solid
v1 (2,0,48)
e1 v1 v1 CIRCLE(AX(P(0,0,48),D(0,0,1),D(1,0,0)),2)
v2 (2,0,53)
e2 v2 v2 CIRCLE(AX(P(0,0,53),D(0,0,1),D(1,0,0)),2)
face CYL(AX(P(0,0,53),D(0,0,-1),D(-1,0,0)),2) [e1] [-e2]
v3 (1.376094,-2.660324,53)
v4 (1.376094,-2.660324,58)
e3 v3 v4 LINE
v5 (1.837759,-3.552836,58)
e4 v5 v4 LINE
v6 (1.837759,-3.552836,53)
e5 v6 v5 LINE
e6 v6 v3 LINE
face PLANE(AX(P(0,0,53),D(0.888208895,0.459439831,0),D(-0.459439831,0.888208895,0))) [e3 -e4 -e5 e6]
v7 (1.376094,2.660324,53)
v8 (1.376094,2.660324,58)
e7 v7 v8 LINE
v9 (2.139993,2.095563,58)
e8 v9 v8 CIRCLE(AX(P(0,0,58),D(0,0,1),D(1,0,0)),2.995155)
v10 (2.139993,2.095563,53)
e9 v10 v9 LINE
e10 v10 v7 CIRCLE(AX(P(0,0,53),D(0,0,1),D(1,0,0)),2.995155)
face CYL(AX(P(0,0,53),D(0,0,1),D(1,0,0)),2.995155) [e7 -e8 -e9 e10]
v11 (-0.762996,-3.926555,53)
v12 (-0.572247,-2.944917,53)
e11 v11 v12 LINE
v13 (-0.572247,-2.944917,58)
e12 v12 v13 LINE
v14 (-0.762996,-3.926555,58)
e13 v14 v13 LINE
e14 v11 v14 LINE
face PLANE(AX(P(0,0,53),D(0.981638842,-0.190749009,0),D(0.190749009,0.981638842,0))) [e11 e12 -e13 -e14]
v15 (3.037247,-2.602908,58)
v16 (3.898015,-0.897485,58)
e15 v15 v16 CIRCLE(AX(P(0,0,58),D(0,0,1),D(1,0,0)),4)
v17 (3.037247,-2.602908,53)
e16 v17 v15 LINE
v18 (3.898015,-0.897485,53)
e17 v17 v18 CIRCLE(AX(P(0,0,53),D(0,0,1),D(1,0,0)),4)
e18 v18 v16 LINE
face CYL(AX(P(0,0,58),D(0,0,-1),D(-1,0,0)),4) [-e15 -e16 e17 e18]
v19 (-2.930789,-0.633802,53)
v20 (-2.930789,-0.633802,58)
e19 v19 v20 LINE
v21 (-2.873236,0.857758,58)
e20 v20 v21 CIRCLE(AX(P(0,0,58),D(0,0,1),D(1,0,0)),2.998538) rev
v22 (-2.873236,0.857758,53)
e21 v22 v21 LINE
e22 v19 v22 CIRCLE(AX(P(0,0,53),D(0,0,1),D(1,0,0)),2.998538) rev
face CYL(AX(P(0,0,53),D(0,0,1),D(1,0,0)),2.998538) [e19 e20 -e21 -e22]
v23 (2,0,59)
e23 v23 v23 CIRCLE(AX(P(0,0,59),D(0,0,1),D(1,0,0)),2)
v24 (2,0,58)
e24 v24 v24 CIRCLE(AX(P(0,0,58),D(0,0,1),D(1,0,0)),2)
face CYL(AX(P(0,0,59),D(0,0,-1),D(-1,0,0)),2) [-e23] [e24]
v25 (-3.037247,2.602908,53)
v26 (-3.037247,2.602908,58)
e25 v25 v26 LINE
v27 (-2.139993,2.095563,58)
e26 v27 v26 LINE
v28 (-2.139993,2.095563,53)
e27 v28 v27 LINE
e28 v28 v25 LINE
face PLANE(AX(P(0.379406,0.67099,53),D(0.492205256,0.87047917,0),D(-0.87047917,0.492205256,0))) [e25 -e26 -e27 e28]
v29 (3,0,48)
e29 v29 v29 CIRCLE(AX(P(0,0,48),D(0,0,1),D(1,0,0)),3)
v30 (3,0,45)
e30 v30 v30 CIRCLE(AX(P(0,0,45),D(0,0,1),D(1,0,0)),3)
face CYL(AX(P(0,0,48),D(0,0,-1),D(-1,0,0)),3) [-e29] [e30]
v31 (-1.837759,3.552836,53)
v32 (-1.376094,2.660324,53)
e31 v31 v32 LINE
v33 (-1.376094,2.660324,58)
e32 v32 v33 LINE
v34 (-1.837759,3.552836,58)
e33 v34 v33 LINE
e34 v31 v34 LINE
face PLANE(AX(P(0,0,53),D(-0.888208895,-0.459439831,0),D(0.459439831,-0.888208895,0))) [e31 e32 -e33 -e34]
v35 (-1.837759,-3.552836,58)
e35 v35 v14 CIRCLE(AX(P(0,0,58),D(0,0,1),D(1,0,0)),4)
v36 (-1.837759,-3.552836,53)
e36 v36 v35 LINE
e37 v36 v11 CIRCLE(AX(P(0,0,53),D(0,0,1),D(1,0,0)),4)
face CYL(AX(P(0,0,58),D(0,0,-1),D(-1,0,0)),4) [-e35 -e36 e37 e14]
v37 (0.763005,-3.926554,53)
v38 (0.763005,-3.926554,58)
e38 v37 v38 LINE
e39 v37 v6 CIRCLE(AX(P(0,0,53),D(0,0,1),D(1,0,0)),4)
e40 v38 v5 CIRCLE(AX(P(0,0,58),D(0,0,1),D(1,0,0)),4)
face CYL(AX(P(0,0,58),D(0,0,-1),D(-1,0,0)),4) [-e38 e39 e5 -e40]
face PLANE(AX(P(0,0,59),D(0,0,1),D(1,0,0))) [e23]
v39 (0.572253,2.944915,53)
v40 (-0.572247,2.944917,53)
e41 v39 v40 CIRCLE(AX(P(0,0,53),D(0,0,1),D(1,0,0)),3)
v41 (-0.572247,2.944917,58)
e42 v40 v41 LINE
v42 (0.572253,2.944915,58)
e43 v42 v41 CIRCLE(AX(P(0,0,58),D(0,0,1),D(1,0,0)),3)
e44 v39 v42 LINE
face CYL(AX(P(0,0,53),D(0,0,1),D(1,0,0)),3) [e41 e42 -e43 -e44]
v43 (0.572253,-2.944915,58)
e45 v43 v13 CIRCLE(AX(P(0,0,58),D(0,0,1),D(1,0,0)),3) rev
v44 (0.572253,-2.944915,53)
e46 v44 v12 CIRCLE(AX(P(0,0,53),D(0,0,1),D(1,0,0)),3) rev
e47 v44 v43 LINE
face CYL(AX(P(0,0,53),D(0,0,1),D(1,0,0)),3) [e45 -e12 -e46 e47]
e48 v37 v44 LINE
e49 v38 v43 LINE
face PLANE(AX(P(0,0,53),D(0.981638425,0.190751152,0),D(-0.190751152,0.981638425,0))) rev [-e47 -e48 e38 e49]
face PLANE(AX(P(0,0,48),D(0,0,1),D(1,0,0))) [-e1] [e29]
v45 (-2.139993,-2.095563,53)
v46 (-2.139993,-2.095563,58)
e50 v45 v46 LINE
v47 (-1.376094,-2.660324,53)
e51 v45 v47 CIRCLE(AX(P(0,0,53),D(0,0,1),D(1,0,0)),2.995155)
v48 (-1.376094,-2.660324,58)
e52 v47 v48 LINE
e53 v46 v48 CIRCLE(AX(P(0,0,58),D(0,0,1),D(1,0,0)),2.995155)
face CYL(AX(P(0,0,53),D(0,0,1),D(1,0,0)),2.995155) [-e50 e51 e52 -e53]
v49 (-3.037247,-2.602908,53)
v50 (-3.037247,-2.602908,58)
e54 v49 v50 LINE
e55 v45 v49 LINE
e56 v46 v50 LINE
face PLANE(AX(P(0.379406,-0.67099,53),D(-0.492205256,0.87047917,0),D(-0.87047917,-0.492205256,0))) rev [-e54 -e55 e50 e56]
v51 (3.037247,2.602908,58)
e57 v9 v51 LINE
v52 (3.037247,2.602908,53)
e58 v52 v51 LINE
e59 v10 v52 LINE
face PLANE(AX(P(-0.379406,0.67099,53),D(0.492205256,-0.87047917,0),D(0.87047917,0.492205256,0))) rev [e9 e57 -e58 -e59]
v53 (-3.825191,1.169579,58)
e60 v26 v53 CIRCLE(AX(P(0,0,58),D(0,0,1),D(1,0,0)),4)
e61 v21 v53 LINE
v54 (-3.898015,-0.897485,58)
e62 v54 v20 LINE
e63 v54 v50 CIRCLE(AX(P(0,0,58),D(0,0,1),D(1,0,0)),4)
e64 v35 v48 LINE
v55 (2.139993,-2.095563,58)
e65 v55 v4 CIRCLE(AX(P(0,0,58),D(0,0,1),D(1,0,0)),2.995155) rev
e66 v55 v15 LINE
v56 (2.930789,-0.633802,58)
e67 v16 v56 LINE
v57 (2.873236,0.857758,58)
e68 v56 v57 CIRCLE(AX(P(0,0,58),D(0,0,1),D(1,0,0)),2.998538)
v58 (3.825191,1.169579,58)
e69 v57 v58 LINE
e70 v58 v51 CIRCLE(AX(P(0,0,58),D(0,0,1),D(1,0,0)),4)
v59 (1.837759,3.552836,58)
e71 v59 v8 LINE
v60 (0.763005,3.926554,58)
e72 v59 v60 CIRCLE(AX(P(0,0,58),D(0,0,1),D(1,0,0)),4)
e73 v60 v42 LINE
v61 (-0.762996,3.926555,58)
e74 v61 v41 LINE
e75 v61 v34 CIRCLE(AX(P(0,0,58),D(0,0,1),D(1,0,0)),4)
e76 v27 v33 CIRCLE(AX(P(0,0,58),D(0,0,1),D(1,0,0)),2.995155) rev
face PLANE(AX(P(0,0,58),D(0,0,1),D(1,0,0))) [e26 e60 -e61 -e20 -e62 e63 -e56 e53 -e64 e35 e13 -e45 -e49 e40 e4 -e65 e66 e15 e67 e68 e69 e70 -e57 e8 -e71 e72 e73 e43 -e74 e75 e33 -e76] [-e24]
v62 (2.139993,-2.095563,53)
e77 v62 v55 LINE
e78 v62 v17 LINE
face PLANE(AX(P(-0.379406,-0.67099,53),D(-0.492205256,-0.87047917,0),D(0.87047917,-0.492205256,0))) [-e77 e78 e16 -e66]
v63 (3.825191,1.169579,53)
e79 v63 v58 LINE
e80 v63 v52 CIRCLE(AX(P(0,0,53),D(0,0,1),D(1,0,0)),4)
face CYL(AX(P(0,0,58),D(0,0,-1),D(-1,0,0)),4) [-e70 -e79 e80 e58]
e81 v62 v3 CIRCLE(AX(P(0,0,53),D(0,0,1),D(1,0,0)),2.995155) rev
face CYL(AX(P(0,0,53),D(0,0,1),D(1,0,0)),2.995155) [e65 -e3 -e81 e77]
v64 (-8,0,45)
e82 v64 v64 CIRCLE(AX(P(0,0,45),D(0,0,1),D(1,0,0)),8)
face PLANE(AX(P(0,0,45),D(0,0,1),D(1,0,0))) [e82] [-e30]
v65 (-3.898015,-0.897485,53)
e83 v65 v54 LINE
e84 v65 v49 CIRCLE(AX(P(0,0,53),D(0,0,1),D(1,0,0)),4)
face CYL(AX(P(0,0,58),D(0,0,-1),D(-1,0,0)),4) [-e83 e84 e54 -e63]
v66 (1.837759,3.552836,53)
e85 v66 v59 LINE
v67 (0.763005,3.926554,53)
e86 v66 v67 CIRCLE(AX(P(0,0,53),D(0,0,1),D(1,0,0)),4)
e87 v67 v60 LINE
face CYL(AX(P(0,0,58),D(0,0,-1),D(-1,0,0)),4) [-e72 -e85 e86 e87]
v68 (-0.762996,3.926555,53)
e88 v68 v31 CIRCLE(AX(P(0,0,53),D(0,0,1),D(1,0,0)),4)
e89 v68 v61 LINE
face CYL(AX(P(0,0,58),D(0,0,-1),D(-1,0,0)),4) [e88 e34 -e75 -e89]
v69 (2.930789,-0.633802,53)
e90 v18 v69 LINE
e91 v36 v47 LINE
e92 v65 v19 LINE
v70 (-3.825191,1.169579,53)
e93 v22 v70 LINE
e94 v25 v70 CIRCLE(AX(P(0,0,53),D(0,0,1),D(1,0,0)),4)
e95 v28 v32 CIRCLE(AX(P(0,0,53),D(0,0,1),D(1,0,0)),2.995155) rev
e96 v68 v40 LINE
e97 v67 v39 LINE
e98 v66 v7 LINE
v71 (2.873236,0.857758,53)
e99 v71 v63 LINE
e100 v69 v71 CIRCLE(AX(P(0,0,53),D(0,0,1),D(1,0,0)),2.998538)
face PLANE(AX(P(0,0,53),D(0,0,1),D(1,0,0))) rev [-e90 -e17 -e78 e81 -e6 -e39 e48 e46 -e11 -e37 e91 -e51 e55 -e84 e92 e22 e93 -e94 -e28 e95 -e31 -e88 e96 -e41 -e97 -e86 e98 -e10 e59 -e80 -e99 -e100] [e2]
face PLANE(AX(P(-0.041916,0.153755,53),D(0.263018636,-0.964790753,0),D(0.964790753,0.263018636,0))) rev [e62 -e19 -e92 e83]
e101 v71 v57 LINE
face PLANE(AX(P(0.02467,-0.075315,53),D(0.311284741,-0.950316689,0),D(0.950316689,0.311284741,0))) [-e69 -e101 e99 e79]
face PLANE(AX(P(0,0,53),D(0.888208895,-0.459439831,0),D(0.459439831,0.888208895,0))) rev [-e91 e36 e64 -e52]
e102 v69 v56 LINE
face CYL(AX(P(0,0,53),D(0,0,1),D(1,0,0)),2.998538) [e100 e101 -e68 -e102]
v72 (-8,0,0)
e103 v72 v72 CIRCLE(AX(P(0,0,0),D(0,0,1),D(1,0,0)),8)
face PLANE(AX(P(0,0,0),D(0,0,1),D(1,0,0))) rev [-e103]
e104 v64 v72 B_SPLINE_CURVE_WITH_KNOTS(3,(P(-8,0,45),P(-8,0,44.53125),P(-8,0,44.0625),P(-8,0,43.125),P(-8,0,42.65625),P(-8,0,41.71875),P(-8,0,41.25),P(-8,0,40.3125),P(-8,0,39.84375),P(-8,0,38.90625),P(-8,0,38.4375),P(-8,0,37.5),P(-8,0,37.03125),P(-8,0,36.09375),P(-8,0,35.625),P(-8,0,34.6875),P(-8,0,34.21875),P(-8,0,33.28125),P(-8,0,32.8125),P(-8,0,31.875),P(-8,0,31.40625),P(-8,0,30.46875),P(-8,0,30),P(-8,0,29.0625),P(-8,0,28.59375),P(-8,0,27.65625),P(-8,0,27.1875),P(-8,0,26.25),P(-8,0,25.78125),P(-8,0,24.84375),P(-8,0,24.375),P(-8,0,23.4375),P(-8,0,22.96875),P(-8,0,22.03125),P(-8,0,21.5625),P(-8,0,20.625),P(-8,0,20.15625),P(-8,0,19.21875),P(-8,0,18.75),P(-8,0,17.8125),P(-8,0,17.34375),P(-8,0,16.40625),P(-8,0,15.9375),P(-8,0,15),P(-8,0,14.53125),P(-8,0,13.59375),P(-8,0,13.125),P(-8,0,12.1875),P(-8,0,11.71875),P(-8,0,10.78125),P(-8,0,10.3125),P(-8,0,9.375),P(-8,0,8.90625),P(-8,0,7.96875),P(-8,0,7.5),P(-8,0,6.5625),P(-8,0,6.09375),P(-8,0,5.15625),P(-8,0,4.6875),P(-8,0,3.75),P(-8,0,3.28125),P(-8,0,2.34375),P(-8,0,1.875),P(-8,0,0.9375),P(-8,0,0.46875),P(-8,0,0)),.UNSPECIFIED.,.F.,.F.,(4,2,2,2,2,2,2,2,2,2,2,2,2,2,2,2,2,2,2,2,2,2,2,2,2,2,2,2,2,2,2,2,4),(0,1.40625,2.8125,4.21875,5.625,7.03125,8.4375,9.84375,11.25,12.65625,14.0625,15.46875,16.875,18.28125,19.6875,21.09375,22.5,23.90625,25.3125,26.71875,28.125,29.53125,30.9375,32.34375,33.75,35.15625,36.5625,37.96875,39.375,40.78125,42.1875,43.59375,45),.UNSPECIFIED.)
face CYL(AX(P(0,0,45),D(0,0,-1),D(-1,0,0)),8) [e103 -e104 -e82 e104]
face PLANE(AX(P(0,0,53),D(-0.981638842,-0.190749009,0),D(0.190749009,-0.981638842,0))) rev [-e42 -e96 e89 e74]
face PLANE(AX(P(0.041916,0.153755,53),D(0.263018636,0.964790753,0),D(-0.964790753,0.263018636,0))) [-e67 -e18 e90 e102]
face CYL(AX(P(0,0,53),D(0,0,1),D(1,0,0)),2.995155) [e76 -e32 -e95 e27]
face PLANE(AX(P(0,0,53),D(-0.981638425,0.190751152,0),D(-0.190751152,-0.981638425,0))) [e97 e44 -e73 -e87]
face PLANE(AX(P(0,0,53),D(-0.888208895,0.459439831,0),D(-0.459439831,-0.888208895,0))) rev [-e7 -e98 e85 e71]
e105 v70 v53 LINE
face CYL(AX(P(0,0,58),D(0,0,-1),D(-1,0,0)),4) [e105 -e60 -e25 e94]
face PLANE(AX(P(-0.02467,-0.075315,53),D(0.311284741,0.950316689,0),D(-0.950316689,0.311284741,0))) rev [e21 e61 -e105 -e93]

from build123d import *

# Parameters (mm, degrees)
ESBO_O1_R                = 8
RESSALTO_EXTRUS_O1_DEPTH = 45
ESBO_O2_R                = 3
RESSALTO_EXTRUS_O2_DEPTH = 3
ESBO_O3_R                = 2
RESSALTO_EXTRUS_O3_DEPTH = 5
ESBO_O4_R                = 4
RESSALTO_EXTRUS_O4_DEPTH = 5
ESBO_O5_R                = 2
RESSALTO_EXTRUS_O5_DEPTH = 1
CORTE_EXTRUS_O11_START   = -5
CORTE_EXTRUS_O11_DEPTH   = 5


# Read off the part's stored shape, not the designer's step: Corte-extrusão11
with BuildPart() as part:
    # Esboço1 → Ressalto-extrusão1 (new body)
    with BuildSketch(Plane.XY):
        with Locations(Location((0, 0, 0), (0, 0, 180))):
            Circle(ESBO_O1_R)
    extrude(amount=RESSALTO_EXTRUS_O1_DEPTH)

    # Esboço2 → Ressalto-extrusão2 (add)
    with BuildSketch(Plane.XY.offset(45)):
        Circle(ESBO_O2_R)
    extrude(amount=RESSALTO_EXTRUS_O2_DEPTH)

    # Esboço3 → Ressalto-extrusão3 (add)
    with BuildSketch(Plane.XY.offset(48)):
        Circle(ESBO_O3_R)
    extrude(amount=RESSALTO_EXTRUS_O3_DEPTH)

    # Esboço4 → Ressalto-extrusão4 (add)
    with BuildSketch(Plane.XY.offset(53)):
        Circle(ESBO_O4_R)
    extrude(amount=RESSALTO_EXTRUS_O4_DEPTH)

    # Esboço5 → Ressalto-extrusão5 (add)
    with BuildSketch(Plane.XY.offset(58)):
        Circle(ESBO_O5_R)
    extrude(amount=RESSALTO_EXTRUS_O5_DEPTH)

    # Corte-extrusão11 outline → Corte-extrusão11 (cut)
    with BuildSketch(Plane.XY.offset(58).offset(CORTE_EXTRUS_O11_START)):
        with BuildLine():
            ThreePointArc((-0.572247027, 2.944916525), (3.275e-06, 3), (0.572253456, 2.944915276))
            Line((0.572253456, 2.944915276), (0.763004609, 3.926553701))
            ThreePointArc((0.763004609, 3.926553701), (4.366e-06, 4), (-0.762996037, 3.926555367))
            Line((-0.762996037, 3.926555367), (-0.572247027, 2.944916525))
        make_face()
        with BuildLine():
            ThreePointArc((3.037246914, 2.602908216), (2.483346926, 3.135759564), (1.837759325, 3.552835581))
            Line((1.837759325, 3.552835581), (1.376093618, 2.660323526))
            ThreePointArc((1.376093618, 2.660323526), (1.780577016, 2.408422803), (2.139992834, 2.095563308))
            Line((2.139992834, 2.095563308), (3.037246914, 2.602908216))
        make_face()
        with BuildLine():
            Line((-1.376093618, 2.660323526), (-1.837759325, 3.552835581))
            ThreePointArc((-1.837759325, 3.552835581), (-2.483346926, 3.135759564), (-3.037246914, 2.602908216))
            Line((-3.037246914, 2.602908216), (-2.139992834, 2.095563308))
            ThreePointArc((-2.139992834, 2.095563308), (-1.780577016, 2.408422803), (-1.376093618, 2.660323526))
        make_face()
        with BuildLine():
            ThreePointArc((3.898015048, -0.897484644), (3.997519889, 0.140835844), (3.825190717, 1.169579401))
            Line((3.825190717, 1.169579401), (2.873235611, 0.857757981))
            ThreePointArc((2.873235611, 0.857757981), (2.996308475, 0.115616418), (2.93078938, -0.633802208))
            Line((2.93078938, -0.633802208), (3.898015048, -0.897484644))
        make_face()
        with BuildLine():
            Line((-2.873235611, 0.857757981), (-3.825190717, 1.169579401))
            ThreePointArc((-3.825190717, 1.169579401), (-3.997519889, 0.140835844), (-3.898015048, -0.897484644))
            Line((-3.898015048, -0.897484644), (-2.93078938, -0.633802208))
            ThreePointArc((-2.93078938, -0.633802208), (-2.996308475, 0.115616418), (-2.873235611, 0.857757981))
        make_face()
        with BuildLine():
            Line((-2.139992834, -2.095563308), (-3.037246914, -2.602908216))
            ThreePointArc((-3.037246914, -2.602908216), (-2.483346926, -3.135759564), (-1.837759325, -3.552835581))
            Line((-1.837759325, -3.552835581), (-1.376093618, -2.660323526))
            ThreePointArc((-1.376093618, -2.660323526), (-1.780577016, -2.408422803), (-2.139992834, -2.095563308))
        make_face()
        with BuildLine():
            ThreePointArc((1.837759325, -3.552835581), (2.483346926, -3.135759564), (3.037246914, -2.602908216))
            Line((3.037246914, -2.602908216), (2.139992834, -2.095563308))
            ThreePointArc((2.139992834, -2.095563308), (1.780577016, -2.408422803), (1.376093618, -2.660323526))
            Line((1.376093618, -2.660323526), (1.837759325, -3.552835581))
        make_face()
        with BuildLine():
            Line((-0.572247027, -2.944916525), (-0.762996037, -3.926555367))
            ThreePointArc((-0.762996037, -3.926555367), (4.366e-06, -4), (0.763004609, -3.926553701))
            Line((0.763004609, -3.926553701), (0.572253456, -2.944915276))
            ThreePointArc((0.572253456, -2.944915276), (3.275e-06, -3), (-0.572247027, -2.944916525))
        make_face()
    extrude(amount=CORTE_EXTRUS_O11_DEPTH, mode=Mode.SUBTRACT)


solid = part.part
